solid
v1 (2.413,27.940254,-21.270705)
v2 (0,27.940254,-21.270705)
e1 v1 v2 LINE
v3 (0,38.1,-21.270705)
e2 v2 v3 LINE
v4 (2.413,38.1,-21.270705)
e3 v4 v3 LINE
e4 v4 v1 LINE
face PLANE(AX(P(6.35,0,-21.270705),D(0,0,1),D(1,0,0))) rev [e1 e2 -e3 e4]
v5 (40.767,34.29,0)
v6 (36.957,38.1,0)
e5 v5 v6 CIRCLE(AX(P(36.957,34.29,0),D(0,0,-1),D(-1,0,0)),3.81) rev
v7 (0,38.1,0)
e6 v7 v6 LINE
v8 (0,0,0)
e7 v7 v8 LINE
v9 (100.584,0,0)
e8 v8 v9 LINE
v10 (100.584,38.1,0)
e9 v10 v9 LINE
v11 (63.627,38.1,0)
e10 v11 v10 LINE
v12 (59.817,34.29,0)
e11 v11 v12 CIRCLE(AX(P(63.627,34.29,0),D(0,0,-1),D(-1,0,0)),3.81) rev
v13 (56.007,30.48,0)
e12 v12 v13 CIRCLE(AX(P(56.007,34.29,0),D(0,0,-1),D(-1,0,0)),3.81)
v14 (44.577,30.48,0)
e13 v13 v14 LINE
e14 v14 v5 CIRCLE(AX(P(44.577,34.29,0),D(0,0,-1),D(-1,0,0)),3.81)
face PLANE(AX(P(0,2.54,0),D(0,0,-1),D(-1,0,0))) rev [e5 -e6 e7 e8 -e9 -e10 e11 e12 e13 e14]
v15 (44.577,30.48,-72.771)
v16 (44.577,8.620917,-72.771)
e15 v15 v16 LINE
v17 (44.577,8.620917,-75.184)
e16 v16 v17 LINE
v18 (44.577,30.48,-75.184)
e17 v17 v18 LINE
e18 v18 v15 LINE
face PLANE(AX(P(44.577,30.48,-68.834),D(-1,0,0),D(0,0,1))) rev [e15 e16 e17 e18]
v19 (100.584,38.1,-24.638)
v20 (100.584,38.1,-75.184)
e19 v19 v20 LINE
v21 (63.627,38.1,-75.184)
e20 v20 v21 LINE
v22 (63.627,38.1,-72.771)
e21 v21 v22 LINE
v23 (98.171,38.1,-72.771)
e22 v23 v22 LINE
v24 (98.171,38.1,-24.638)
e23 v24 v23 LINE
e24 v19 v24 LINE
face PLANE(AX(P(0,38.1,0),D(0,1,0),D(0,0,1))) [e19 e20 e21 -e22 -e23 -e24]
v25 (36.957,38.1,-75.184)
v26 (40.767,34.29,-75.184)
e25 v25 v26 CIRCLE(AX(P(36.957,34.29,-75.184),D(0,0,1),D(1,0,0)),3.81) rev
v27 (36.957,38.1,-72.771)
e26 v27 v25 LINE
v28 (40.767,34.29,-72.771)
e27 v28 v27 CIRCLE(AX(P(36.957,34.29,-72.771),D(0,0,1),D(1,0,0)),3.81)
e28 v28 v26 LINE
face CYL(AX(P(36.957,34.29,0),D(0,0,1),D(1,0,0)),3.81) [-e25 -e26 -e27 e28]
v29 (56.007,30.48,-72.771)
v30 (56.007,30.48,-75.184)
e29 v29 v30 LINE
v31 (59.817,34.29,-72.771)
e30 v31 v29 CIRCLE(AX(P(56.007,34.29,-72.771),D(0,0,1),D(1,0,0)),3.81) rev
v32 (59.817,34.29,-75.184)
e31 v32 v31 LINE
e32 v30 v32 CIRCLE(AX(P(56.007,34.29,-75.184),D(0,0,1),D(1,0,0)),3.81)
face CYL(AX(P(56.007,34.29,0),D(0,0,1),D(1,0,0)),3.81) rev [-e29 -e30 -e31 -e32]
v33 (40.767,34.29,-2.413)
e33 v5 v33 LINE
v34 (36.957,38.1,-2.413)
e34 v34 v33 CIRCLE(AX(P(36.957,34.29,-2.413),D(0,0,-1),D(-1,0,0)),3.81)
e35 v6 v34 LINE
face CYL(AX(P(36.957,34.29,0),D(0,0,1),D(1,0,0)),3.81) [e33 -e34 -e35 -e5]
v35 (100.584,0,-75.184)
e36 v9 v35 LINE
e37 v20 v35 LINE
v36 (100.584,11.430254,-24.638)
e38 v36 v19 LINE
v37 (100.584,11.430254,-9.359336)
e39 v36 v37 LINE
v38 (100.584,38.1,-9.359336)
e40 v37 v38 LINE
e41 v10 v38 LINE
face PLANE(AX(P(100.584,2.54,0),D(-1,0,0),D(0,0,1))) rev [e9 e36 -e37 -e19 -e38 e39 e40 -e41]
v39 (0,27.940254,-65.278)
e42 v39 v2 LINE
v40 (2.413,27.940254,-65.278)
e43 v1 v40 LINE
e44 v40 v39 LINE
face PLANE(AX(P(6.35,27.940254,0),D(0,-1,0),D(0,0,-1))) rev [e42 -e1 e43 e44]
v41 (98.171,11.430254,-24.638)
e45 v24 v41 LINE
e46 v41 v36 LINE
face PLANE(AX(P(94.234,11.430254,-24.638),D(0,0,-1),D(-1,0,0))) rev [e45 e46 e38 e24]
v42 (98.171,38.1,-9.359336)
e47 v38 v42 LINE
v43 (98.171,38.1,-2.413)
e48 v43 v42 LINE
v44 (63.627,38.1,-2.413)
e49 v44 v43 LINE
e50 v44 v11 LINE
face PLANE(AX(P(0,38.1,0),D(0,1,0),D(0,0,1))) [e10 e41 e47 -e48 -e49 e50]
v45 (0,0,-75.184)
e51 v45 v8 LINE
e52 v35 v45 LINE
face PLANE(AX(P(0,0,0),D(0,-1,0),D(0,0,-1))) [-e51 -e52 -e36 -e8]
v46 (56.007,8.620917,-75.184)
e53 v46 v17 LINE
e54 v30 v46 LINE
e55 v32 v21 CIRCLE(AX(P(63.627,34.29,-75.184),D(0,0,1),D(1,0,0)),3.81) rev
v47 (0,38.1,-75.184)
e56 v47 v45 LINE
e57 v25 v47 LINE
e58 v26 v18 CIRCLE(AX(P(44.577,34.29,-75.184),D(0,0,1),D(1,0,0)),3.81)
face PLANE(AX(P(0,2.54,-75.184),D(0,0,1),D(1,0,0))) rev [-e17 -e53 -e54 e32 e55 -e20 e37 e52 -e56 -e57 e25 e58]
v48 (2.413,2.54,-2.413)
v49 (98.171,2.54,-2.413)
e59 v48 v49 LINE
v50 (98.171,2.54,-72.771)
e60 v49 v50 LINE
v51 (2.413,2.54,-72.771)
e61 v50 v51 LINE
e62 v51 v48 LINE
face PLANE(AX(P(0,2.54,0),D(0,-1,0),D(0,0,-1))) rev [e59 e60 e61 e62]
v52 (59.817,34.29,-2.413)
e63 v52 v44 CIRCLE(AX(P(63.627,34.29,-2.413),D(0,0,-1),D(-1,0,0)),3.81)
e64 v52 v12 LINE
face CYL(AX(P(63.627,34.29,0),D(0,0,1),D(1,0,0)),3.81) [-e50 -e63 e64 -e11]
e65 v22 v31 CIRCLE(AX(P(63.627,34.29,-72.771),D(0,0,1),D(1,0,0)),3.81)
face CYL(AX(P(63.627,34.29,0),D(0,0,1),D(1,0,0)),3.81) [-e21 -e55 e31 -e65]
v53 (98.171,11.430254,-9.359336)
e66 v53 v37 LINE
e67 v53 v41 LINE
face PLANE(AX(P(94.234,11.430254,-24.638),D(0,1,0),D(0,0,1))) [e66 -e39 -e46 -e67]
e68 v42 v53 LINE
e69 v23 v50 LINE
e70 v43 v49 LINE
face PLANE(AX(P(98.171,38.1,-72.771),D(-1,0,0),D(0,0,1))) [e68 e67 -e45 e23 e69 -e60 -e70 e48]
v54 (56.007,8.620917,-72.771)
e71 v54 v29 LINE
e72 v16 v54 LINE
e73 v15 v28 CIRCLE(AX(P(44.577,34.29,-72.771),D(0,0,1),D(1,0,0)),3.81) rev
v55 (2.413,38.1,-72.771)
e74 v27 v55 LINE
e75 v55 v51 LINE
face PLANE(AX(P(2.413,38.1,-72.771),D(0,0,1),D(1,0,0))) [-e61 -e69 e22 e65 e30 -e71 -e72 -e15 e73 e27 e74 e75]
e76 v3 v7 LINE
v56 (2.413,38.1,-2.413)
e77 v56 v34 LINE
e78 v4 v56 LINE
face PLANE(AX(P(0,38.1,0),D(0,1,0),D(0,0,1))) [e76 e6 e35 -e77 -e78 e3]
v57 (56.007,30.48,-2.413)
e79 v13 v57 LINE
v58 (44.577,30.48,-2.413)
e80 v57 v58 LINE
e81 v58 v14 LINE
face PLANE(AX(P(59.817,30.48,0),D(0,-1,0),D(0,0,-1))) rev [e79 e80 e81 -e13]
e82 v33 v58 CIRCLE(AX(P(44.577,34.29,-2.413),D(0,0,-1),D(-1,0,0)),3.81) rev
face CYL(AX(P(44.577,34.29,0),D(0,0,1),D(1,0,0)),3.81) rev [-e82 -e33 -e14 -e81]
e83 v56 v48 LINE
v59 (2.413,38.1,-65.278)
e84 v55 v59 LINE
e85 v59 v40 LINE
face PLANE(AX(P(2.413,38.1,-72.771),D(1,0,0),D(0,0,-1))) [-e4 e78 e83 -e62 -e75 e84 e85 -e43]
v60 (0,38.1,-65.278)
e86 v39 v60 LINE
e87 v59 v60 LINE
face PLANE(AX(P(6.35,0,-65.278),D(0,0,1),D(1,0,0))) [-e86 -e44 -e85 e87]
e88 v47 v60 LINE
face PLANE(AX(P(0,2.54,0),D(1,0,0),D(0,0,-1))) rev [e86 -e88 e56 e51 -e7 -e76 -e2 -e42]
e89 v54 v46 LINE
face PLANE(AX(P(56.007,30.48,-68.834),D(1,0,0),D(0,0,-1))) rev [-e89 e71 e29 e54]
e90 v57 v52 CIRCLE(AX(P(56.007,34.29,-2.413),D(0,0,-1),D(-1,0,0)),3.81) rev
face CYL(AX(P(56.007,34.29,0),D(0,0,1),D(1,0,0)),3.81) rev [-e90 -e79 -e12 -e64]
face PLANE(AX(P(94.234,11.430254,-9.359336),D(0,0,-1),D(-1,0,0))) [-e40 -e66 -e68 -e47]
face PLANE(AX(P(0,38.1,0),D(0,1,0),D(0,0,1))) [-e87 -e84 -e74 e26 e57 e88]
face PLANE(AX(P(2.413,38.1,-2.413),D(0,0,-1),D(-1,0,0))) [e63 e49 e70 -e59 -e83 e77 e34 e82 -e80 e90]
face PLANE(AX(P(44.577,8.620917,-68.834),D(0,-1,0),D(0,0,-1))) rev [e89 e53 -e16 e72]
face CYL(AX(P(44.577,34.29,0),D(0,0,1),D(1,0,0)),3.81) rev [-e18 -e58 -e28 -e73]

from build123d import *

# Parameters (mm, degrees)
SKETCH1_W           = 100.584
SKETCH1_H           = 75.184
BOSS_EXTRUDE1_DEPTH = 2.54
SKETCH2_W           = 100.584
SKETCH2_H           = 75.184
SKETCH2_W_2         = 95.758
SKETCH2_H_2         = 70.358
BOSS_EXTRUDE2_DEPTH = 35.56
SKETCH3_W           = 19.05
SKETCH3_H           = 7.62
CUT_EXTRUDE1_DEPTH  = 132.230274373
FILLET1_R           = 3.81
CUT_EXTRUDE2_DEPTH  = 6.35
SKETCH5_W           = 15.278664452
SKETCH5_H           = 26.67
CUT_EXTRUDE3_DEPTH  = 6.35
SKETCH6_W           = 11.43
SKETCH6_H           = 21.859082526
CUT_EXTRUDE4_DEPTH  = 6.35


with BuildPart() as part:
    # Sketch1 → Boss-Extrude1 (new body)
    with BuildSketch(Plane(origin=(0, 0, 0), x_dir=(1, 0, 0), z_dir=(0, 1, 0))):
        with Locations((50.292, 37.592)):
            Rectangle(SKETCH1_W, SKETCH1_H)
    extrude(amount=BOSS_EXTRUDE1_DEPTH)

    # Sketch2 → Boss-Extrude2 (add)
    with BuildSketch(Plane(origin=(0, 2.54, 0), x_dir=(1, 0, 0), z_dir=(0, 1, 0))):
        with Locations((50.292, 37.592)):
            Rectangle(SKETCH2_W, SKETCH2_H)
        with Locations((50.292, 37.592)):
            Rectangle(SKETCH2_W_2, SKETCH2_H_2, mode=Mode.SUBTRACT)
    extrude(amount=BOSS_EXTRUDE2_DEPTH)

    # Sketch3 → Cut-Extrude1 (cut, through all)
    with BuildSketch(Plane(origin=(0, 0, -75.184), x_dir=(-1, 0, 0), z_dir=(0, 0, -1))):
        with Locations((-50.292, 34.29)):
            Rectangle(SKETCH3_W, SKETCH3_H)
    extrude(amount=-CUT_EXTRUDE1_DEPTH, mode=Mode.SUBTRACT)

    # Fillet1
    fillet1_edges = [part.edges().sort_by_distance(p)[0] for p in [
        (40.767, 30.48, -1.2065),
        (59.817, 30.48, -1.2065),
        (59.817, 30.48, -73.9775),
        (40.767, 30.48, -73.9775),
    ]]
    fillet(fillet1_edges, radius=FILLET1_R)
    fillet1_2_edges = [part.edges().sort_by_distance(p)[0] for p in [
        (40.767, 38.1, -1.2065),
        (59.817, 38.1, -1.2065),
        (59.817, 38.1, -73.9775),
        (40.767, 38.1, -73.9775),
    ]]
    fillet(fillet1_2_edges, radius=FILLET1_R - 0.0001)  # a hair under: the kernel refuses the full size

    # Sketch4 → Cut-Extrude2 (cut)
    with BuildSketch(Plane.ZY):
        Polygon((-21.270705039, 38.1), (-58.928, 38.1), (-65.278, 38.1), (-65.278, 31.750254), (-65.278, 27.940254), (-58.928, 27.940254), (-21.270705039, 27.940254), align=None)
    extrude(amount=-CUT_EXTRUDE2_DEPTH, mode=Mode.SUBTRACT)

    # Sketch5 → Cut-Extrude3 (cut)
    with BuildSketch(Plane(origin=(100.584, 0, 0), x_dir=(0, 0, -1), z_dir=(1, 0, 0))):
        with Locations((16.998667774, 24.765254)):
            Rectangle(SKETCH5_W, SKETCH5_H)
    extrude(amount=-CUT_EXTRUDE3_DEPTH, mode=Mode.SUBTRACT)

    # Sketch6 → Cut-Extrude4 (cut)
    with BuildSketch(Plane(origin=(0, 0, -75.184), x_dir=(-1, 0, 0), z_dir=(0, 0, -1))):
        with Locations((-50.292, 19.550458737)):
            Rectangle(SKETCH6_W, SKETCH6_H)
    extrude(amount=-CUT_EXTRUDE4_DEPTH, mode=Mode.SUBTRACT)


solid = part.part
